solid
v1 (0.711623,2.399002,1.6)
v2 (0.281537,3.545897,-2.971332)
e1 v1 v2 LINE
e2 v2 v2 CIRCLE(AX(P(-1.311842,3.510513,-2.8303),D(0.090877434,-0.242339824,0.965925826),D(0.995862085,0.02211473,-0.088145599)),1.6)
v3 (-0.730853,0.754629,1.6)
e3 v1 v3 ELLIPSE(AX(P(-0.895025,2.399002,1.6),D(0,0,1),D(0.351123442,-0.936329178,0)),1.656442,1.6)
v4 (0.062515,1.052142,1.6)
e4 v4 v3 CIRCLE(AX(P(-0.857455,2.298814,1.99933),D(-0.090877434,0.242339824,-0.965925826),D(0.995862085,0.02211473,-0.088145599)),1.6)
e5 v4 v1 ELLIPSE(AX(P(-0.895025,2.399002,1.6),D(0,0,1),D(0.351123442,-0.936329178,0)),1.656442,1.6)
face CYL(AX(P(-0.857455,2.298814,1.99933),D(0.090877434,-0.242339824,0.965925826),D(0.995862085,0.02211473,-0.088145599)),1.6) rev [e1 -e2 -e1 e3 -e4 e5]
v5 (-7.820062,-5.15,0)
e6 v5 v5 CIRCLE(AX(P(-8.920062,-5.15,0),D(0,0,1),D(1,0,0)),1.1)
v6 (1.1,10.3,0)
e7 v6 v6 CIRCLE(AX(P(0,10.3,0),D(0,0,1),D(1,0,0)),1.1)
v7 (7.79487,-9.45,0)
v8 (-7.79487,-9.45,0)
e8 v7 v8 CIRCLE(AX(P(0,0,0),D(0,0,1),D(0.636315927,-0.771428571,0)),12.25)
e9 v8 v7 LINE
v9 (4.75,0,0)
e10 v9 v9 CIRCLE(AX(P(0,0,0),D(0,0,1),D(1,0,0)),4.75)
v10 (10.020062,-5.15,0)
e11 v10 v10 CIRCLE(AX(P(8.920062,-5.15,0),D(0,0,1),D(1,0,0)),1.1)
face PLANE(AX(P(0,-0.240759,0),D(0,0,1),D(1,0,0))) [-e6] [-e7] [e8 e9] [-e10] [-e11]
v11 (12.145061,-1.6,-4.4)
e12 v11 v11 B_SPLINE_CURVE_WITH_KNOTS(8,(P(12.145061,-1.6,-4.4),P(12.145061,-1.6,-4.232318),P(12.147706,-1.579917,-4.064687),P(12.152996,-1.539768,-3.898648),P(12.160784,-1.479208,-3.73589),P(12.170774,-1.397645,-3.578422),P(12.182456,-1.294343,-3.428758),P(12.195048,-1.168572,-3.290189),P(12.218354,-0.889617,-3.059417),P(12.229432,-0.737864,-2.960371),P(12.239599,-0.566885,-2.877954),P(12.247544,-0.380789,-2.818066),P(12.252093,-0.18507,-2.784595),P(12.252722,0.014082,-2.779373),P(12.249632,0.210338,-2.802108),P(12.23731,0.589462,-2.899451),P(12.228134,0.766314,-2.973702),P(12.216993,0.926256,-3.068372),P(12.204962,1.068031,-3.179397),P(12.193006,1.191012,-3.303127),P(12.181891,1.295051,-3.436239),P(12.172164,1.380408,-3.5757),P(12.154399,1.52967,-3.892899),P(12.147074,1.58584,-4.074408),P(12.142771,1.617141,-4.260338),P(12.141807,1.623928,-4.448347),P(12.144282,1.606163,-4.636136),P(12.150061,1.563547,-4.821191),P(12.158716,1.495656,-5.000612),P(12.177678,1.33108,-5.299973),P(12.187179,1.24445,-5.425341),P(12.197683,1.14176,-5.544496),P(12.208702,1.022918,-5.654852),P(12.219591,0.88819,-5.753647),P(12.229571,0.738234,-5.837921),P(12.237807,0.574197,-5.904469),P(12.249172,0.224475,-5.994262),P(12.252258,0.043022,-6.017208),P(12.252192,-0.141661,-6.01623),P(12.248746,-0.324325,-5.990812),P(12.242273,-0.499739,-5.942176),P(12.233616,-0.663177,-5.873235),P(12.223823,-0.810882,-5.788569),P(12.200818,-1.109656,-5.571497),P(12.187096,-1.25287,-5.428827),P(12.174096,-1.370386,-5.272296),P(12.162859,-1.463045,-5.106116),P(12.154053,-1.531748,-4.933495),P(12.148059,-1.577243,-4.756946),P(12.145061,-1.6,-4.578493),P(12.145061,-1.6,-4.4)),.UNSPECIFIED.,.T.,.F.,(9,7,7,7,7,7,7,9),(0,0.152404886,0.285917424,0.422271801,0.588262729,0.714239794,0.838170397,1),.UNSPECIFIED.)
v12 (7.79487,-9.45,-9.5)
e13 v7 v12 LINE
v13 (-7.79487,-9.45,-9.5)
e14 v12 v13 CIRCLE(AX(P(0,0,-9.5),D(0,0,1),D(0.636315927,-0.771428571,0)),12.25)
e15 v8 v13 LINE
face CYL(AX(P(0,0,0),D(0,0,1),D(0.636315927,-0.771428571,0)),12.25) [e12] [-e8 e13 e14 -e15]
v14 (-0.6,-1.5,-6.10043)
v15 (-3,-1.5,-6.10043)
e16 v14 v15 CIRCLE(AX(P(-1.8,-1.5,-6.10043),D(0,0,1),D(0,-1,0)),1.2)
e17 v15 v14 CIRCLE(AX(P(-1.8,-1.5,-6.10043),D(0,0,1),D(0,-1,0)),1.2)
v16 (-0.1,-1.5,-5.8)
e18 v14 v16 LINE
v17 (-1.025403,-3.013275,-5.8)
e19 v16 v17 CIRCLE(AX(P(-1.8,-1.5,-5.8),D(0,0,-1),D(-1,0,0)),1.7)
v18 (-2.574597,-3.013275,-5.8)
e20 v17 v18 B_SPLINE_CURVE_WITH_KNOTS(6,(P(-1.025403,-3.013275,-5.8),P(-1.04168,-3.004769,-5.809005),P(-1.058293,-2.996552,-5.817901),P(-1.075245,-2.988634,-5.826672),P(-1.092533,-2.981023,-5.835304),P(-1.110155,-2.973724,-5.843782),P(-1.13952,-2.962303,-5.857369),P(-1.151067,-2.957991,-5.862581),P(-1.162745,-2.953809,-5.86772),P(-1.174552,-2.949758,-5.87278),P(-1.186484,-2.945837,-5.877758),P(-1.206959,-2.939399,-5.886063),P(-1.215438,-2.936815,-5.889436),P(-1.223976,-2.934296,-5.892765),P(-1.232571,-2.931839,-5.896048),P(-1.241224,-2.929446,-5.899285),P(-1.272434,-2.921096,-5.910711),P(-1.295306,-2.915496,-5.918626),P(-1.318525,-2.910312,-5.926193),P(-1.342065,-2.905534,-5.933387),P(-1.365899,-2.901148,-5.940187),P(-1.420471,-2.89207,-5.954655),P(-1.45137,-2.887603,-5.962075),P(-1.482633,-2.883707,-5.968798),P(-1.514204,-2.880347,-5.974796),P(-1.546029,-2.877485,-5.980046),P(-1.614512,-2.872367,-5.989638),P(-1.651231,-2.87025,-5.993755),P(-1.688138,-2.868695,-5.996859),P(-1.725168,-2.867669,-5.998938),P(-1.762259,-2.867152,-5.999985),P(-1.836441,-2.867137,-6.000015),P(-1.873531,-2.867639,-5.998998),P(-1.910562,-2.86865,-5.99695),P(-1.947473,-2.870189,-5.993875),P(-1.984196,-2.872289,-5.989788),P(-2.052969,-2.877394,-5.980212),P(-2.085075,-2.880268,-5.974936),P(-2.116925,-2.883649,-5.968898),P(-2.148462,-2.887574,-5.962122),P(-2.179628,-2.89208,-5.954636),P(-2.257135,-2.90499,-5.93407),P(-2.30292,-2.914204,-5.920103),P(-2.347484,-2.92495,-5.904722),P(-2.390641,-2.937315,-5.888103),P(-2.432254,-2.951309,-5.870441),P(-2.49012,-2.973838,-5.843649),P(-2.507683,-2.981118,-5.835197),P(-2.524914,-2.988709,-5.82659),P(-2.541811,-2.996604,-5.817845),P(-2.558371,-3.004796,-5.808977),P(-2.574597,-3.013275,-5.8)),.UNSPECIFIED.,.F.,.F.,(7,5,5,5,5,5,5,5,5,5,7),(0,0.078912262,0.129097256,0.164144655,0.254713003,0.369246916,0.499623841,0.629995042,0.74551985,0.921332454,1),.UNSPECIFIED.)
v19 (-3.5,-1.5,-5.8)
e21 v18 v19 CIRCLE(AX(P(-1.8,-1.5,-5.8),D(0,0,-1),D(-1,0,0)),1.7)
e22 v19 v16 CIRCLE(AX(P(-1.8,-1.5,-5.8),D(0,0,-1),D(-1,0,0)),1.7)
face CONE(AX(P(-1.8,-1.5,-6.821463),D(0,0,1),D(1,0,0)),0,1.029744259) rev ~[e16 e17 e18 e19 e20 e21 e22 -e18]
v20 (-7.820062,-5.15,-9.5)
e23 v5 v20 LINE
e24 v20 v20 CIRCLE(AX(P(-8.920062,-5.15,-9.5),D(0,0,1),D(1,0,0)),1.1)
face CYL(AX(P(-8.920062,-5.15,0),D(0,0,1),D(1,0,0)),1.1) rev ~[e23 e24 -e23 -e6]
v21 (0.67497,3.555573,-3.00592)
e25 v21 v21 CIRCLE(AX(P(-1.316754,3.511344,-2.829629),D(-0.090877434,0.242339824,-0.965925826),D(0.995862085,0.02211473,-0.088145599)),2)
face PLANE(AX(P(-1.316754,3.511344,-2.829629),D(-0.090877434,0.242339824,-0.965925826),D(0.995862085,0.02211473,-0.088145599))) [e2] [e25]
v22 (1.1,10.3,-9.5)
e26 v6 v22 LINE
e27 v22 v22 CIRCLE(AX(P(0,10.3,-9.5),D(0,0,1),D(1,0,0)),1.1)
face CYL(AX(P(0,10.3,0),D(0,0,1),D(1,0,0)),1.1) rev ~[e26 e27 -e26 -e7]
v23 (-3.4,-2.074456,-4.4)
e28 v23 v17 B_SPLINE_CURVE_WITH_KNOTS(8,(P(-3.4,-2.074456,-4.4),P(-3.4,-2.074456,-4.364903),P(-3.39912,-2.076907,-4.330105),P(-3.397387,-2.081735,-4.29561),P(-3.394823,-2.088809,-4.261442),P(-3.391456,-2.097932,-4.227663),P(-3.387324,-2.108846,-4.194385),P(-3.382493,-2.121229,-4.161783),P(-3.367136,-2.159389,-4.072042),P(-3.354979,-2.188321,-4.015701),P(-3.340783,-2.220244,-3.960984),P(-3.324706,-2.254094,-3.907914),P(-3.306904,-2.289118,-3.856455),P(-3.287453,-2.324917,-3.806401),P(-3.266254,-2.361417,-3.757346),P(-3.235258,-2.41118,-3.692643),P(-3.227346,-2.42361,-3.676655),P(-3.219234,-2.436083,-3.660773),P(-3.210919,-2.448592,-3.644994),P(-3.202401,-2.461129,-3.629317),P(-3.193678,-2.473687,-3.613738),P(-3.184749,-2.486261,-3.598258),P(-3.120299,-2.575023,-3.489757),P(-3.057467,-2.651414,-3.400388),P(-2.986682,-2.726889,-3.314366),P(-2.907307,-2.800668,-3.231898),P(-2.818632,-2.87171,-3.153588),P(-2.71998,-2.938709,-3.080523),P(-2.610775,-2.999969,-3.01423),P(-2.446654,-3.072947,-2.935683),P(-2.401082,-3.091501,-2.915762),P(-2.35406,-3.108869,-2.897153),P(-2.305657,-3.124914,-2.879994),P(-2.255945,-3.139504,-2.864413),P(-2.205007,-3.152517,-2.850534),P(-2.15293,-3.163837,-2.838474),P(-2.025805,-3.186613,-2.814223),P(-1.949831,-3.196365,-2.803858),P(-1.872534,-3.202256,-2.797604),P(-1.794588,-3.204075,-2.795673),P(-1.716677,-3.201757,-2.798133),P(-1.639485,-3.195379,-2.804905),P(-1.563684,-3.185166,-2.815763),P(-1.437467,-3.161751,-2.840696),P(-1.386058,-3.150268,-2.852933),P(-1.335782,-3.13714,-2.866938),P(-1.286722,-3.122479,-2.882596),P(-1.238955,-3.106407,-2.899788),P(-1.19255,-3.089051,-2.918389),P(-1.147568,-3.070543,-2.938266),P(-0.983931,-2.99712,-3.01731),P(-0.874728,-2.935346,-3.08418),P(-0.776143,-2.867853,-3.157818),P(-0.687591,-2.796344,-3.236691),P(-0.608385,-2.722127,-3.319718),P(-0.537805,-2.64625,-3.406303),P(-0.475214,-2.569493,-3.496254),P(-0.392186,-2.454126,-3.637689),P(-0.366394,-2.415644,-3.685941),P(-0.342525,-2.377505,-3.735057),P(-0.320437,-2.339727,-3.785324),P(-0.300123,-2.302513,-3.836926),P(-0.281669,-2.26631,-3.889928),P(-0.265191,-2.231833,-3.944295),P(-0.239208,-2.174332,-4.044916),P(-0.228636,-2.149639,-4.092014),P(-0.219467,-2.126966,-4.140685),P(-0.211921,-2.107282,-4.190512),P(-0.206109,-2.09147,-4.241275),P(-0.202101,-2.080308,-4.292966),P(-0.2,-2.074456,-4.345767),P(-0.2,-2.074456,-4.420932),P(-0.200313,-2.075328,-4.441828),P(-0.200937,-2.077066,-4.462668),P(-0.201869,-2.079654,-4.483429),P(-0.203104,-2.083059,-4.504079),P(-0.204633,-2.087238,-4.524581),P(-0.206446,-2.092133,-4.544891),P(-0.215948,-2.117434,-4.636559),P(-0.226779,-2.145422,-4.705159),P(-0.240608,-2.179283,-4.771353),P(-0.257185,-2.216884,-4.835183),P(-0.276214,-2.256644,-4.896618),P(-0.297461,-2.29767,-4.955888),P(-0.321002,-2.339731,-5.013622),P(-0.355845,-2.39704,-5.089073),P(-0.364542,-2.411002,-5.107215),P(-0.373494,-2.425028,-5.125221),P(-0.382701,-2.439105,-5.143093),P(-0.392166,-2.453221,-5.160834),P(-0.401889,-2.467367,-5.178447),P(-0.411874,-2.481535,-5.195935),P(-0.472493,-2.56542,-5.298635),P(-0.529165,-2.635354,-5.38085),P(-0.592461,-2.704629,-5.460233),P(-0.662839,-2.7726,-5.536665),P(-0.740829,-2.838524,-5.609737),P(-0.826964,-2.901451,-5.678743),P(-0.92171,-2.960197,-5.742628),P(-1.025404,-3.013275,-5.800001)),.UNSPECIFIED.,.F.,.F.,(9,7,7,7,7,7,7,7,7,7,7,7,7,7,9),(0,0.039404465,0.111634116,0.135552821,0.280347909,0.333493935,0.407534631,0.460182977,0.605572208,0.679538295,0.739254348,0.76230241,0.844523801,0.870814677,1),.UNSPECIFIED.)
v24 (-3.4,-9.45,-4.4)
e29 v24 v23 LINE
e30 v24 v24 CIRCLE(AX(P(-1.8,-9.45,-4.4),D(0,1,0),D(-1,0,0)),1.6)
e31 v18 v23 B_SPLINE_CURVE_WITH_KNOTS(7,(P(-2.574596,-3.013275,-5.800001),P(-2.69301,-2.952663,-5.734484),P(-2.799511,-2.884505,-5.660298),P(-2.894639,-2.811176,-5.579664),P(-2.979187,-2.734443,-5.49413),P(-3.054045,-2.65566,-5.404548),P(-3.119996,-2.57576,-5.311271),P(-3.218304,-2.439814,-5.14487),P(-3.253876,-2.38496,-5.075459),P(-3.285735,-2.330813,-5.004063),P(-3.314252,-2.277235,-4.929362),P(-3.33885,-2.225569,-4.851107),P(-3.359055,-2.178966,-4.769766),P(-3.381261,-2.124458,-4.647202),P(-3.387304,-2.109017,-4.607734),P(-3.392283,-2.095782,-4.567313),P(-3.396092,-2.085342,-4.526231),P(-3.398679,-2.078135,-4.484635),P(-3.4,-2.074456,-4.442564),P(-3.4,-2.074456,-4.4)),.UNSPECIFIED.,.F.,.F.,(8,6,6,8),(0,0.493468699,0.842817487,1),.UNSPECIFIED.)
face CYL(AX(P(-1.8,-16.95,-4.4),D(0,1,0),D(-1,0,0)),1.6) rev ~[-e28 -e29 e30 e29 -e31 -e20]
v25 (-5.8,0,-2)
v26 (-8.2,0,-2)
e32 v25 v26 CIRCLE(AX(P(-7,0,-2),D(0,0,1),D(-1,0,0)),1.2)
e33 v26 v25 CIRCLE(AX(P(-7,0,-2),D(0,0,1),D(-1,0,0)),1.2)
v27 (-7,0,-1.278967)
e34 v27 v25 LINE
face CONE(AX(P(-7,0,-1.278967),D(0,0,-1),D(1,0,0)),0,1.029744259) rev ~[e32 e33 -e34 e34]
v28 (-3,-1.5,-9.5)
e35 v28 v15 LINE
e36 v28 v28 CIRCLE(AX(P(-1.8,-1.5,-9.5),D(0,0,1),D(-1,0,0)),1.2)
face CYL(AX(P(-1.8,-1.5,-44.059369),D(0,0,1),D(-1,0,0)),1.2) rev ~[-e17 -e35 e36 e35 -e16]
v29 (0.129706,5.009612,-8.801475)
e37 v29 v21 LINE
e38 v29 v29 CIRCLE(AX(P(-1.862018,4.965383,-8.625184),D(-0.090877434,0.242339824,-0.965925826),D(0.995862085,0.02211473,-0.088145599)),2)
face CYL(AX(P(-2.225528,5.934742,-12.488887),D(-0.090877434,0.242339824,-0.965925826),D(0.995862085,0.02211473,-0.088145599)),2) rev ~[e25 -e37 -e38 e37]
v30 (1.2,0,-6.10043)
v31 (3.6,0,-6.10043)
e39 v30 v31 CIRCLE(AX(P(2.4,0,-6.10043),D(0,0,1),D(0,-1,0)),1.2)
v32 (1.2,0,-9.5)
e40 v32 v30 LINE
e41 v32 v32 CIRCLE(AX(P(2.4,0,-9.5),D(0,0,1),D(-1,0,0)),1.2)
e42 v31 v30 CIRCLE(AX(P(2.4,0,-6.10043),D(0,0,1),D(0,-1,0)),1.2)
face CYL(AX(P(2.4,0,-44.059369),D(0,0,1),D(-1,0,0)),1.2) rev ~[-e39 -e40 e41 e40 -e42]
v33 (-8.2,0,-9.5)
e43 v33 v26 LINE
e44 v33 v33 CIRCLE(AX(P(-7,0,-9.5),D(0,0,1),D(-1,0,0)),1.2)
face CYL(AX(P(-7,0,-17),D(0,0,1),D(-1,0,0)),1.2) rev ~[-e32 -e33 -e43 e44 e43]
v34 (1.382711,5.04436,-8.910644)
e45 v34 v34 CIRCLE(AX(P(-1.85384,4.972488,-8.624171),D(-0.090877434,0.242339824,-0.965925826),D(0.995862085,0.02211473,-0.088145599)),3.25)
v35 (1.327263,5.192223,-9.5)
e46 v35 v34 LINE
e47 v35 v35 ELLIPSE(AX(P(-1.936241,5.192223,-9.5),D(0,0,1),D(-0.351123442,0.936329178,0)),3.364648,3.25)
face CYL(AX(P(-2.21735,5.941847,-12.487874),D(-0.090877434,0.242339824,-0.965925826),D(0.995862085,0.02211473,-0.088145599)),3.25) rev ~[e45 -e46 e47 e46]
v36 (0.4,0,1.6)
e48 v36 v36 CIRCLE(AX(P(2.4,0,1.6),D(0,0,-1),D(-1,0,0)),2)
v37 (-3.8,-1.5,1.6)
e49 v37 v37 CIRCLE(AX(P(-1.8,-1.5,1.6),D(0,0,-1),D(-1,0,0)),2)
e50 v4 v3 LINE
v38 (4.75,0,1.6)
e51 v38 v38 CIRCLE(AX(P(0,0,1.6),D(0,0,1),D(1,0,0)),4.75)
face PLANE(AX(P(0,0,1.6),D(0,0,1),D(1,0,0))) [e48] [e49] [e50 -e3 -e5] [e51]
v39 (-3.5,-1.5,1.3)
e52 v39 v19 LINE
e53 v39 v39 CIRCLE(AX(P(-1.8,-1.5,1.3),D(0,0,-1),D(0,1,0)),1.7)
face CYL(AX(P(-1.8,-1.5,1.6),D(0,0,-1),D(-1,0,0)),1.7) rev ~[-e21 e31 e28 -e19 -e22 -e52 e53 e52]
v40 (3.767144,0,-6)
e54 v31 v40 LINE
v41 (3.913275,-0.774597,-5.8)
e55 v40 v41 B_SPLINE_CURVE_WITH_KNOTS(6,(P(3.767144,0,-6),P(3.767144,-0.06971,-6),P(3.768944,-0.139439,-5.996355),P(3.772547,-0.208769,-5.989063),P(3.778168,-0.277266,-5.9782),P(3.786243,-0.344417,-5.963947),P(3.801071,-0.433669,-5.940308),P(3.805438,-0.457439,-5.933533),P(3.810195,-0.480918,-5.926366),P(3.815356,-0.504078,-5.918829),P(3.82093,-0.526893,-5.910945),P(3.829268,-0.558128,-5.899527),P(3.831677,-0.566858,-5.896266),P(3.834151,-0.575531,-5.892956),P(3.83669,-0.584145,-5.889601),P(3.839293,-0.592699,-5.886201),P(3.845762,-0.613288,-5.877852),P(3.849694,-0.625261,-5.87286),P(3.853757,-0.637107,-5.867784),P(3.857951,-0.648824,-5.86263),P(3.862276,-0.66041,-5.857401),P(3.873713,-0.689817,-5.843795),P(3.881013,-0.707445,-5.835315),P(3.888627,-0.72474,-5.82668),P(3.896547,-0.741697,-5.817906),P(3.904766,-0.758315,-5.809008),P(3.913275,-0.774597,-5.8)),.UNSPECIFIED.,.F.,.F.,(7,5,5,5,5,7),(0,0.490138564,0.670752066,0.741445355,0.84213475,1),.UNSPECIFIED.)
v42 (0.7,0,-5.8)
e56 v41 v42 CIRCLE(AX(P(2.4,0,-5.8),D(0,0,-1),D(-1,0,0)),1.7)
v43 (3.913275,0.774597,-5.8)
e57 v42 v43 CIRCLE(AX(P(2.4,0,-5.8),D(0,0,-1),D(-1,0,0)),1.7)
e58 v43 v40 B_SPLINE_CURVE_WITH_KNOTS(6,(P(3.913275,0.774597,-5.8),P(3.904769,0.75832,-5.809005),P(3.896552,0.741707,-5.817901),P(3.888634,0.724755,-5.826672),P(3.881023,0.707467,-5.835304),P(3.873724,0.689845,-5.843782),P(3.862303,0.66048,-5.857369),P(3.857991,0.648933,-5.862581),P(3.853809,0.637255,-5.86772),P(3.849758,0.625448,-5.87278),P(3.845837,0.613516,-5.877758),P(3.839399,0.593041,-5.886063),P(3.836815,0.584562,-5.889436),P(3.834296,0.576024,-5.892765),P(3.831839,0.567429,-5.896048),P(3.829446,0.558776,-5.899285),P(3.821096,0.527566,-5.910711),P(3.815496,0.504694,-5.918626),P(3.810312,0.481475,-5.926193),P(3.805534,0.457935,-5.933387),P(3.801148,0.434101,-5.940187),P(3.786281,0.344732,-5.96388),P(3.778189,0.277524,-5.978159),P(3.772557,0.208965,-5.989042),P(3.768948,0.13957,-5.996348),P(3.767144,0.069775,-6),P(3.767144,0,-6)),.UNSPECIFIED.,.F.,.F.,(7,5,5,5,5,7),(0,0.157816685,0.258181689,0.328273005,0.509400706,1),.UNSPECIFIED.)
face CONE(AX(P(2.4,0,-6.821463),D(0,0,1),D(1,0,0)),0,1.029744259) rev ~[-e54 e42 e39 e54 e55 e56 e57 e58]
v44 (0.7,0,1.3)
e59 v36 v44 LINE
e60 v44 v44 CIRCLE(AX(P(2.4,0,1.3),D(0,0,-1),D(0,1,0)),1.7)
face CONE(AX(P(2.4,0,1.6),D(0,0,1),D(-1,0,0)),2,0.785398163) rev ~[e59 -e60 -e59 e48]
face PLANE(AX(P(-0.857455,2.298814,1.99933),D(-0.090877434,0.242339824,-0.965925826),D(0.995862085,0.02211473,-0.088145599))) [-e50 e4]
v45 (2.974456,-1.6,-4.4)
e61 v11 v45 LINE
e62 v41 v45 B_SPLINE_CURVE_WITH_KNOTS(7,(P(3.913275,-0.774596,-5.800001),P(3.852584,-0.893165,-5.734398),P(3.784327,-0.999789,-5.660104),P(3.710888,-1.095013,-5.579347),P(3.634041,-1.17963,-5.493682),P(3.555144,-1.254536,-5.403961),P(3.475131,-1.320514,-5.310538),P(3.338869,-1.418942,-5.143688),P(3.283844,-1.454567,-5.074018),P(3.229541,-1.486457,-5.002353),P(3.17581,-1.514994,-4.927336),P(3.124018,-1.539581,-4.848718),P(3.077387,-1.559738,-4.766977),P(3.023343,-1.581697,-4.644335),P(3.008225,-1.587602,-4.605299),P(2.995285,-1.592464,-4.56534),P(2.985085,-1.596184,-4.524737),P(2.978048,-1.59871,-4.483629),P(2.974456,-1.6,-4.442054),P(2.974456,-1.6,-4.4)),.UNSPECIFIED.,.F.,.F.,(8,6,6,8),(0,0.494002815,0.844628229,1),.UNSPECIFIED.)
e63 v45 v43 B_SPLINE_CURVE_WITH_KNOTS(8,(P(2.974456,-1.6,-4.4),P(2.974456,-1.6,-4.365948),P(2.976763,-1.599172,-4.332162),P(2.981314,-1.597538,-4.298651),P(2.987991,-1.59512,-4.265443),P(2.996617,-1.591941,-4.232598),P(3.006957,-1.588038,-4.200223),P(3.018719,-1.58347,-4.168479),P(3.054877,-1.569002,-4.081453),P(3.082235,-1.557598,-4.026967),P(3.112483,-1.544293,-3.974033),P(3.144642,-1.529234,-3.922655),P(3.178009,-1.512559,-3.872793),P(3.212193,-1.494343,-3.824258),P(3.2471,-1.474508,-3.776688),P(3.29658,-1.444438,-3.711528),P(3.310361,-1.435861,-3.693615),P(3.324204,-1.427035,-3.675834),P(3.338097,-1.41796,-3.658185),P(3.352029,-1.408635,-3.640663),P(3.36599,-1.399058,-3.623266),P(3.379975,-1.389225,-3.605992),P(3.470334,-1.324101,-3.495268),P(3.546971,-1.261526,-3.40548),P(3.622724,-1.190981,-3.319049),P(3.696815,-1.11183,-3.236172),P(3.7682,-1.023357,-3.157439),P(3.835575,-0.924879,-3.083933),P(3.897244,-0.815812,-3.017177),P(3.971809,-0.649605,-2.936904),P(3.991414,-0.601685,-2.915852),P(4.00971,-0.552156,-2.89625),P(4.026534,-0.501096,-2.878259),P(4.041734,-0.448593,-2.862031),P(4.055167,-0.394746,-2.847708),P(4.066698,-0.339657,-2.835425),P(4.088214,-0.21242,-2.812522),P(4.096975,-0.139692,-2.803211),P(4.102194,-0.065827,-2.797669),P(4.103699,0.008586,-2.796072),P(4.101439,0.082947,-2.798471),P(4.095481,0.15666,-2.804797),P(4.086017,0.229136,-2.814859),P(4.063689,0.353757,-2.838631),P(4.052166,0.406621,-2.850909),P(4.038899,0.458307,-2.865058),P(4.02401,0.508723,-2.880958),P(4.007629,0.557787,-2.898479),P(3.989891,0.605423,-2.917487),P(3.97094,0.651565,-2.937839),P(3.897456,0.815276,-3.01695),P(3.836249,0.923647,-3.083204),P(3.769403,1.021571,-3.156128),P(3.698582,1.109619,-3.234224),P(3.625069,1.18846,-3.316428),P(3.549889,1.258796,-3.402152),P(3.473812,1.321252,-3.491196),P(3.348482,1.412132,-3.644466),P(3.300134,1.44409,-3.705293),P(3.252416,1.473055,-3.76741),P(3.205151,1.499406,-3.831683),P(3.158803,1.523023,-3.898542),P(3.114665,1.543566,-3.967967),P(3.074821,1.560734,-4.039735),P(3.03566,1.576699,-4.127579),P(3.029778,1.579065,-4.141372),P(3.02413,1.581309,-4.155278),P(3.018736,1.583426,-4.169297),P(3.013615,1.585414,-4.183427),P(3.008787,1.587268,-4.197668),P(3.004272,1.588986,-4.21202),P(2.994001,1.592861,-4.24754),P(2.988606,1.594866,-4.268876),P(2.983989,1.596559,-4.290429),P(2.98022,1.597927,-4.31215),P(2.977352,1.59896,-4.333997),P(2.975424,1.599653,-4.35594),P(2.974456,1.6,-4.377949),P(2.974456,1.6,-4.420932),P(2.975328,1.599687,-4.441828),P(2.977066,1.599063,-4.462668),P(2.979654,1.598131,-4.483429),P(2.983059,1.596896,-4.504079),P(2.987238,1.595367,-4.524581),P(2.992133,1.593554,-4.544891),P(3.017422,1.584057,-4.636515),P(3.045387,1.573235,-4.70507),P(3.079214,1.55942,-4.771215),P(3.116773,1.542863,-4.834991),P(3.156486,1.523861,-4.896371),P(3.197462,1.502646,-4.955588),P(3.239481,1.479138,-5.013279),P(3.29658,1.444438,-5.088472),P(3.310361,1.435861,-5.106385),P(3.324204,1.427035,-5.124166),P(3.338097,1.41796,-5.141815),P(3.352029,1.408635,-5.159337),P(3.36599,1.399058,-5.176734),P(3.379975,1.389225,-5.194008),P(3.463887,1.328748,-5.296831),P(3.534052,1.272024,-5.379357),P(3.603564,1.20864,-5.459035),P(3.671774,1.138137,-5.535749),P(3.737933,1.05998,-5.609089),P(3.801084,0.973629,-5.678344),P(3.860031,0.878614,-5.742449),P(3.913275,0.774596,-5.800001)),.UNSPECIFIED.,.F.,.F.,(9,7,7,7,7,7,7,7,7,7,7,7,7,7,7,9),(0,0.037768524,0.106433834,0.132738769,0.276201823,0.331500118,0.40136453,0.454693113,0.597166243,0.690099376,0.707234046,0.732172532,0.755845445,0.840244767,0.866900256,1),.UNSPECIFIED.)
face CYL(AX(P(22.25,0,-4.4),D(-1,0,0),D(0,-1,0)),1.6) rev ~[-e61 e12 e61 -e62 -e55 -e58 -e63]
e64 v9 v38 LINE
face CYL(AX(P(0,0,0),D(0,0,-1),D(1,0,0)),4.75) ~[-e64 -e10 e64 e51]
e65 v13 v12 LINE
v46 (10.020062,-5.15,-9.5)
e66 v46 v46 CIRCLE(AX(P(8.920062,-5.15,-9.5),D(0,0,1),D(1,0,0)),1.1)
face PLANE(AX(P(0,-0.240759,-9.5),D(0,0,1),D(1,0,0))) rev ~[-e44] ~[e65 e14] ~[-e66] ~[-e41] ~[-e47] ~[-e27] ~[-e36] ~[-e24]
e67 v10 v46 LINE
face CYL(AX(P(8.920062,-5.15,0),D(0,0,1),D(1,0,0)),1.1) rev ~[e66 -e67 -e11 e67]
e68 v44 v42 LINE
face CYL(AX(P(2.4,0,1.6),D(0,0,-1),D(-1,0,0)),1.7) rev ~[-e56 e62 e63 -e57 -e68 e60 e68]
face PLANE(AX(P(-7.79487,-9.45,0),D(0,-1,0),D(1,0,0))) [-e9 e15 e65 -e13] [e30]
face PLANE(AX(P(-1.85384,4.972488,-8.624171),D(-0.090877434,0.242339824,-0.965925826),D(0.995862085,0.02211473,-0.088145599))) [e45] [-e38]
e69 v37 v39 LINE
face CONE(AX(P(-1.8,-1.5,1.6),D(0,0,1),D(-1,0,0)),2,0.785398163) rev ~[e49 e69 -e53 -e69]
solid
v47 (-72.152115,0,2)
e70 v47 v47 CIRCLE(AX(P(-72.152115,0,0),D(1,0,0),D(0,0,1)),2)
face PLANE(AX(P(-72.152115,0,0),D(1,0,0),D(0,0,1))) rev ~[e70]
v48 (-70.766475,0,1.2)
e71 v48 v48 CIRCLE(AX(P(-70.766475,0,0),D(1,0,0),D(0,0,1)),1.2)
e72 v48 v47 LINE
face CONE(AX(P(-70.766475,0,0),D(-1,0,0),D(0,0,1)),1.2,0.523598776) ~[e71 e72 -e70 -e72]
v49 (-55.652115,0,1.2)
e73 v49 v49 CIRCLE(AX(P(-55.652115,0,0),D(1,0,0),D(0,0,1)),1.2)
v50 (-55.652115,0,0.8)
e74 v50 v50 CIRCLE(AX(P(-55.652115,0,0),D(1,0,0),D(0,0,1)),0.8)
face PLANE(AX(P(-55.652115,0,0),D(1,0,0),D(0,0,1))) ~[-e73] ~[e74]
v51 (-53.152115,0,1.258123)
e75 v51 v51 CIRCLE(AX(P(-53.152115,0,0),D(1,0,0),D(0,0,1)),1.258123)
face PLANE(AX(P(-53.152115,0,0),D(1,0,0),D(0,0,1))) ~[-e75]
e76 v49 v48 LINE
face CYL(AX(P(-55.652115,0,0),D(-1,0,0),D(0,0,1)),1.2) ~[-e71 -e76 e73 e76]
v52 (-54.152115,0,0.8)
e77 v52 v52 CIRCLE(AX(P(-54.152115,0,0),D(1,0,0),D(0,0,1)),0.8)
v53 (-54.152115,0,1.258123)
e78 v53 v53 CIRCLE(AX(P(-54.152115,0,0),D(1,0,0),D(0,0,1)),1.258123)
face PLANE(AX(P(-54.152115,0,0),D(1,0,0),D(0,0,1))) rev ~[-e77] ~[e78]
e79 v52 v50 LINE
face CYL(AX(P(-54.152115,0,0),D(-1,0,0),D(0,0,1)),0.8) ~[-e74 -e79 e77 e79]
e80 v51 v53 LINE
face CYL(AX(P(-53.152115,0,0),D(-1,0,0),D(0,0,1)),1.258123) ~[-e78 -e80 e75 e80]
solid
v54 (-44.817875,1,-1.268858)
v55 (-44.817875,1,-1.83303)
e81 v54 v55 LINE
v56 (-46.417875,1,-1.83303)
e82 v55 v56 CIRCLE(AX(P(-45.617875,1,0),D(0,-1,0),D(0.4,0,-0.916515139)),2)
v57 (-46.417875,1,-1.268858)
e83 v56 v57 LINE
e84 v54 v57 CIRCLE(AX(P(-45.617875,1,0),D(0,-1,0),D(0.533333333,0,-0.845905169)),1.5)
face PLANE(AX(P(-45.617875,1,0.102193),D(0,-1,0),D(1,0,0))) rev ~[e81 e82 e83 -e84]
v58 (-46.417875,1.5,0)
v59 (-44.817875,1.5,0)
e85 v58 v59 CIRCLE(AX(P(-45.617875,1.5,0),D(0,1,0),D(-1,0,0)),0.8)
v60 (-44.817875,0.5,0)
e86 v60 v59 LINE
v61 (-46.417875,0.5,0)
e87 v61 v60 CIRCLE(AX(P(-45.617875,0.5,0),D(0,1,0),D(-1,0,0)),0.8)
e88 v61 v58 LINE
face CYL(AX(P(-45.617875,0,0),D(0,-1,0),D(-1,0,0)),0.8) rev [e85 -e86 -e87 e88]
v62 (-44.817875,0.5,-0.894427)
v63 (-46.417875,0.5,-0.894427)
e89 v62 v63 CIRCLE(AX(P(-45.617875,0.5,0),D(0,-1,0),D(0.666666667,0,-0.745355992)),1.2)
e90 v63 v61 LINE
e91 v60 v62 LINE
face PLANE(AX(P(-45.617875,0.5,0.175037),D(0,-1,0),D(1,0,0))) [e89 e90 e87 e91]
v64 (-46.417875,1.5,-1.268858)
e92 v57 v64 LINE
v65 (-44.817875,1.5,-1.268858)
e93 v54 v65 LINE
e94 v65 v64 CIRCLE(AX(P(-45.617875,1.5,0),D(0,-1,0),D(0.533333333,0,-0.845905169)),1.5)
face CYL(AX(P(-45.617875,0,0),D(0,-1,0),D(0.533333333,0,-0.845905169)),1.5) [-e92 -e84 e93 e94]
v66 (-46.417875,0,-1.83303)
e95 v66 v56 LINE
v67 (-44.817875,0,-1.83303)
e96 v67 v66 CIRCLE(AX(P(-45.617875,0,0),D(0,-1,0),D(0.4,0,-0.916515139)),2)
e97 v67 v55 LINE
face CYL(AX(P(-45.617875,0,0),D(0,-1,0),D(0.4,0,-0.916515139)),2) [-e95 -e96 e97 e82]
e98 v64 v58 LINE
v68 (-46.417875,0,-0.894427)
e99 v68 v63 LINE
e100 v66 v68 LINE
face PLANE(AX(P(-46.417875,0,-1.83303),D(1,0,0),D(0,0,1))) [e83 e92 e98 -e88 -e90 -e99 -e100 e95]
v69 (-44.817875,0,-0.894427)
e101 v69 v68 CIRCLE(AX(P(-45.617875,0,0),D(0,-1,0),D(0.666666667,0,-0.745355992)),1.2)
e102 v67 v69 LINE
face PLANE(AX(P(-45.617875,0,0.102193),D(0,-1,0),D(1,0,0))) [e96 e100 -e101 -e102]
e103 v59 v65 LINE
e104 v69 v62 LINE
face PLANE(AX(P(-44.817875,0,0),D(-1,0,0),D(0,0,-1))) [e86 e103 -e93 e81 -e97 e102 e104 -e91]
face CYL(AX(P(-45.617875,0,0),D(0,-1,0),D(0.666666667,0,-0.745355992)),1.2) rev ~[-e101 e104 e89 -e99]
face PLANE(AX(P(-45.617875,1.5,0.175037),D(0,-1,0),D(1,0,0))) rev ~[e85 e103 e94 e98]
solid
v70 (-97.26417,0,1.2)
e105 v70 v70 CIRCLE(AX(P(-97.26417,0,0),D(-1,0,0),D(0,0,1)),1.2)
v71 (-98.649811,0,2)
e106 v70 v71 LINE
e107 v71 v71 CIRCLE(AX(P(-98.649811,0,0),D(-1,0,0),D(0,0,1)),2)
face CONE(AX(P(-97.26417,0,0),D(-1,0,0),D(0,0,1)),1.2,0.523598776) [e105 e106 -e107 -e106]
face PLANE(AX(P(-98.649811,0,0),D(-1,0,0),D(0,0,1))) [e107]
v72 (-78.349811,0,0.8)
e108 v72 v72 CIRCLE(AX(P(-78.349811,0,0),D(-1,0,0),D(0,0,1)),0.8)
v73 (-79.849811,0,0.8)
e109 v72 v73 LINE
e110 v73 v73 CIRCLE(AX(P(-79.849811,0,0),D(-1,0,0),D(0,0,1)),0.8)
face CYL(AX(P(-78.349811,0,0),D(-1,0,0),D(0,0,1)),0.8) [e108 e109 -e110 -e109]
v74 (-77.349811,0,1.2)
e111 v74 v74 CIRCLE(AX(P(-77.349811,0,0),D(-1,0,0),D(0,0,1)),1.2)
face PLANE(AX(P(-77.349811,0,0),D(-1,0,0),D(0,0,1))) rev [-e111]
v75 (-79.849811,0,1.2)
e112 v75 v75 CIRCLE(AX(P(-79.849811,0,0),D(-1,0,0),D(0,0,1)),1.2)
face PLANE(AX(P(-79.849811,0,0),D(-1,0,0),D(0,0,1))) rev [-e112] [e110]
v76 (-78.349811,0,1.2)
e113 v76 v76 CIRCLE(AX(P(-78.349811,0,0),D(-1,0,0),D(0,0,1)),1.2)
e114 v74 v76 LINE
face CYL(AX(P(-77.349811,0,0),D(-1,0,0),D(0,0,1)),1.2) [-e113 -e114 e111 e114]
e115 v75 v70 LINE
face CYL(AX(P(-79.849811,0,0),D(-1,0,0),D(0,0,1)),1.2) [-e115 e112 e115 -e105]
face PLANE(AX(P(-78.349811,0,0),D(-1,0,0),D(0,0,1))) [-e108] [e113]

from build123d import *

# Parameters (mm, degrees)
F0_R            = 1.1
F0_R_2          = 4.75
F1_DEPTH        = 9.5
F2_DEPTH        = 1.6
F5_R            = 1.6
F6_DEPTH        = 14.5553932812
F8_R            = 2
F9_DEPTH        = 10
F10_R           = 3.25
F11_DEPTH       = 4
F13_D           = 3.4
F13_DEPTH       = 7.4
F13_CSINK_D     = 4
F13_CSINK_ANGLE = 90
F13_TIP         = 1.0214630523
F15_D           = 2.4
F17_D           = 3.2
F17_DEPTH       = 7.5
F17_TIP         = 0.9613769904
F19_D           = 2.4
F19_DEPTH       = 7.5
F19_TIP         = 0.7210327428
F22_D           = 3.2
F22_DEPTH       = 10
F22_TIP         = 0.9613769904
F26_DEPTH       = 1
F27_DEPTH       = 1.5
F28_DEPTH       = 0.5


# Not quite as in the source:
# - a feature of the source that left no trace in its solid (it failed there, or was rolled back) is left out


with BuildPart() as f1:
    # F0 (on Top) → F1 (new body)
    with BuildSketch(Plane.XY):
        with BuildLine():
            ThreePointArc((7.794870108, -9.45), (0, 12.25), (-7.794870108, -9.45))
            Line((-7.794870108, -9.45), (7.794870108, -9.45))
        make_face()
        with Locations((-8.920061659, -5.15)):
            Circle(F0_R, mode=Mode.SUBTRACT)
        Circle(F0_R_2, mode=Mode.SUBTRACT)
        with Locations((8.920061659, -5.15)):
            Circle(F0_R, mode=Mode.SUBTRACT)
        with Locations((0, 10.3)):
            Circle(F0_R, mode=Mode.SUBTRACT)
        Circle(F0_R_2)
    extrude(amount=-F1_DEPTH)

    # F0 (on Top) → F2 (join)
    with BuildSketch(Plane.XY):
        Circle(F0_R_2)
    extrude(amount=F2_DEPTH)

    # F5 (on face) → F6 (cut, through all)
    with BuildSketch(Plane(origin=(0.1177941054, -0.3141176144, 1.2520200421), x_dir=(0.9958620848, 0.0221147302, -0.0881455994), z_dir=(-0.0908774339, 0.2423398236, -0.9659258263))):
        with Locations((-0.9793015197, -2.7162409388)):
            Circle(F5_R)
    extrude(amount=F6_DEPTH, mode=Mode.SUBTRACT)

    # F8 (on face) → F9 (cut)
    with BuildSketch(Plane(origin=(-1.2453674026, 3.3209797402, -13.2368673522), x_dir=(0.9958620848, 0.0221147302, -0.0881455994), z_dir=(-0.0908774339, 0.2423398236, -0.9659258263))):
        with Locations((-0.984233483, -2.7172092824)):
            Circle(F8_R)
    extrude(amount=-F9_DEPTH, mode=Mode.SUBTRACT)

    # F10 (on face) → F11 (cut)
    with BuildSketch(Plane(origin=(-1.2453674026, 3.3209797402, -13.2368673522), x_dir=(0.9958620848, 0.0221147302, -0.0881455994), z_dir=(-0.0908774339, 0.2423398236, -0.9659258263))):
        with Locations((-0.9760213434, -2.7243471704)):
            Circle(F10_R)
    extrude(amount=-F11_DEPTH, mode=Mode.SUBTRACT)

    # F13
    with Locations(Plane.XY.offset(1.6)):
        with Locations((-1.8, -1.5), (2.4, 0)):
            CounterSinkHole(F13_D / 2, F13_CSINK_D / 2, depth=F13_DEPTH, counter_sink_angle=F13_CSINK_ANGLE)
            with Locations((0, 0, -(F13_DEPTH + F13_TIP / 2))):  # 118° drill point
                Cone(0, F13_D / 2, F13_TIP, mode=Mode.SUBTRACT)

    # F15 (through all)
    with Locations(Plane(origin=(0, 0, -9.5), x_dir=(1, 0, 0), z_dir=(0, 0, -1))):
        with Locations((2.4, 0), (-1.8, 1.5)):
            Hole(F15_D / 2)

    # F17
    with Locations(Plane.XZ.offset(9.45)):
        with Locations((-1.8, -4.4)):
            Hole(F17_D / 2, depth=F17_DEPTH)
            with Locations((0, 0, -(F17_DEPTH + F17_TIP / 2))):  # 118° drill point
                Cone(0, F17_D / 2, F17_TIP, mode=Mode.SUBTRACT)

    # F19
    with Locations(Plane(origin=(0, 0, -9.5), x_dir=(1, 0, 0), z_dir=(0, 0, -1))):
        with Locations((-7, 0)):
            Hole(F19_D / 2, depth=F19_DEPTH)
            with Locations((0, 0, -(F19_DEPTH + F19_TIP / 2))):  # 118° drill point
                Cone(0, F19_D / 2, F19_TIP, mode=Mode.SUBTRACT)

    # F22
    with Locations(Plane.YZ.offset(12.25)):
        with Locations((0, -4.4)):
            Hole(F22_D / 2, depth=F22_DEPTH)
            with Locations((0, 0, -(F22_DEPTH + F22_TIP / 2))):  # 118° drill point
                Cone(0, F22_D / 2, F22_TIP, mode=Mode.SUBTRACT)


with BuildPart() as f24:
    # F23 (on Front) → F24 (revolve)
    with BuildSketch(Plane.XZ):
        Polygon((-98.6498106364, 0), (-77.3498106364, 0), (-77.3498106364, 1.2), (-78.3498106364, 1.2), (-78.3498106364, 0.8), (-79.8498106364, 0.8), (-79.8498106364, 1.2), (-97.2641699903, 1.2), (-98.6498106364, 2), align=None)
    revolve(axis=Axis((-87.9998106364, 0, 0), (-1, 0, 0)))


with BuildPart() as f26:
    # F25 (on Front) → F26 (new body)
    with BuildSketch(Plane.XZ):
        with BuildLine():
            Line((-44.8178747118, -1.268857754), (-44.8178747118, -1.833030278))
            ThreePointArc((-44.8178747118, -1.833030278), (-45.6178747118, 2), (-46.4178747118, -1.833030278))
            Line((-46.4178747118, -1.833030278), (-46.4178747118, -1.268857754))
            ThreePointArc((-46.4178747118, -1.268857754), (-45.6178747118, 1.5), (-44.8178747118, -1.268857754))
        make_face()
        with BuildLine():
            Line((-44.8178747118, 0), (-44.8178747118, -0.894427191))
            ThreePointArc((-44.8178747118, -0.894427191), (-45.6178747118, 1.2), (-46.4178747118, -0.894427191))
            Line((-46.4178747118, -0.894427191), (-46.4178747118, 0))
            ThreePointArc((-46.4178747118, 0), (-45.6178747118, 0.8), (-44.8178747118, 0))
        make_face()
        with BuildLine():
            Line((-44.8178747118, -0.894427191), (-44.8178747118, -1.268857754))
            ThreePointArc((-44.8178747118, -1.268857754), (-45.6178747118, 1.5), (-46.4178747118, -1.268857754))
            Line((-46.4178747118, -1.268857754), (-46.4178747118, -0.894427191))
            ThreePointArc((-46.4178747118, -0.894427191), (-45.6178747118, 1.2), (-44.8178747118, -0.894427191))
        make_face()
    extrude(amount=-F26_DEPTH)

    # F25 (on Front) → F27 (join)
    with BuildSketch(Plane.XZ):
        with BuildLine():
            Line((-44.8178747118, 0), (-44.8178747118, -0.894427191))
            ThreePointArc((-44.8178747118, -0.894427191), (-45.6178747118, 1.2), (-46.4178747118, -0.894427191))
            Line((-46.4178747118, -0.894427191), (-46.4178747118, 0))
            ThreePointArc((-46.4178747118, 0), (-45.6178747118, 0.8), (-44.8178747118, 0))
        make_face()
        with BuildLine():
            Line((-44.8178747118, -0.894427191), (-44.8178747118, -1.268857754))
            ThreePointArc((-44.8178747118, -1.268857754), (-45.6178747118, 1.5), (-46.4178747118, -1.268857754))
            Line((-46.4178747118, -1.268857754), (-46.4178747118, -0.894427191))
            ThreePointArc((-46.4178747118, -0.894427191), (-45.6178747118, 1.2), (-44.8178747118, -0.894427191))
        make_face()
    extrude(amount=-F27_DEPTH)

    # F25 (on Front) → F28 (cut)
    with BuildSketch(Plane.XZ):
        with BuildLine():
            Line((-44.8178747118, 0), (-44.8178747118, -0.894427191))
            ThreePointArc((-44.8178747118, -0.894427191), (-45.6178747118, 1.2), (-46.4178747118, -0.894427191))
            Line((-46.4178747118, -0.894427191), (-46.4178747118, 0))
            ThreePointArc((-46.4178747118, 0), (-45.6178747118, 0.8), (-44.8178747118, 0))
        make_face()
    extrude(amount=-F28_DEPTH, mode=Mode.SUBTRACT)


with BuildPart() as f30:
    # F29 (on Front) → F30 (revolve)
    with BuildSketch(Plane.XZ):
        Polygon((-72.1521154046, 2), (-72.1521154046, 0), (-53.1521154046, 0), (-53.1521154046, 1.2581226385), (-54.1521154046, 1.2581226385), (-54.1521154046, 0.8), (-55.6521154046, 0.8), (-55.6521154046, 1.2), (-70.7664747586, 1.2), align=None)
    revolve(axis=Axis((-62.2638948262, 0, 0), (1, 0, 0)))


solid = Compound([f1.part, f24.part, f26.part, f30.part])
